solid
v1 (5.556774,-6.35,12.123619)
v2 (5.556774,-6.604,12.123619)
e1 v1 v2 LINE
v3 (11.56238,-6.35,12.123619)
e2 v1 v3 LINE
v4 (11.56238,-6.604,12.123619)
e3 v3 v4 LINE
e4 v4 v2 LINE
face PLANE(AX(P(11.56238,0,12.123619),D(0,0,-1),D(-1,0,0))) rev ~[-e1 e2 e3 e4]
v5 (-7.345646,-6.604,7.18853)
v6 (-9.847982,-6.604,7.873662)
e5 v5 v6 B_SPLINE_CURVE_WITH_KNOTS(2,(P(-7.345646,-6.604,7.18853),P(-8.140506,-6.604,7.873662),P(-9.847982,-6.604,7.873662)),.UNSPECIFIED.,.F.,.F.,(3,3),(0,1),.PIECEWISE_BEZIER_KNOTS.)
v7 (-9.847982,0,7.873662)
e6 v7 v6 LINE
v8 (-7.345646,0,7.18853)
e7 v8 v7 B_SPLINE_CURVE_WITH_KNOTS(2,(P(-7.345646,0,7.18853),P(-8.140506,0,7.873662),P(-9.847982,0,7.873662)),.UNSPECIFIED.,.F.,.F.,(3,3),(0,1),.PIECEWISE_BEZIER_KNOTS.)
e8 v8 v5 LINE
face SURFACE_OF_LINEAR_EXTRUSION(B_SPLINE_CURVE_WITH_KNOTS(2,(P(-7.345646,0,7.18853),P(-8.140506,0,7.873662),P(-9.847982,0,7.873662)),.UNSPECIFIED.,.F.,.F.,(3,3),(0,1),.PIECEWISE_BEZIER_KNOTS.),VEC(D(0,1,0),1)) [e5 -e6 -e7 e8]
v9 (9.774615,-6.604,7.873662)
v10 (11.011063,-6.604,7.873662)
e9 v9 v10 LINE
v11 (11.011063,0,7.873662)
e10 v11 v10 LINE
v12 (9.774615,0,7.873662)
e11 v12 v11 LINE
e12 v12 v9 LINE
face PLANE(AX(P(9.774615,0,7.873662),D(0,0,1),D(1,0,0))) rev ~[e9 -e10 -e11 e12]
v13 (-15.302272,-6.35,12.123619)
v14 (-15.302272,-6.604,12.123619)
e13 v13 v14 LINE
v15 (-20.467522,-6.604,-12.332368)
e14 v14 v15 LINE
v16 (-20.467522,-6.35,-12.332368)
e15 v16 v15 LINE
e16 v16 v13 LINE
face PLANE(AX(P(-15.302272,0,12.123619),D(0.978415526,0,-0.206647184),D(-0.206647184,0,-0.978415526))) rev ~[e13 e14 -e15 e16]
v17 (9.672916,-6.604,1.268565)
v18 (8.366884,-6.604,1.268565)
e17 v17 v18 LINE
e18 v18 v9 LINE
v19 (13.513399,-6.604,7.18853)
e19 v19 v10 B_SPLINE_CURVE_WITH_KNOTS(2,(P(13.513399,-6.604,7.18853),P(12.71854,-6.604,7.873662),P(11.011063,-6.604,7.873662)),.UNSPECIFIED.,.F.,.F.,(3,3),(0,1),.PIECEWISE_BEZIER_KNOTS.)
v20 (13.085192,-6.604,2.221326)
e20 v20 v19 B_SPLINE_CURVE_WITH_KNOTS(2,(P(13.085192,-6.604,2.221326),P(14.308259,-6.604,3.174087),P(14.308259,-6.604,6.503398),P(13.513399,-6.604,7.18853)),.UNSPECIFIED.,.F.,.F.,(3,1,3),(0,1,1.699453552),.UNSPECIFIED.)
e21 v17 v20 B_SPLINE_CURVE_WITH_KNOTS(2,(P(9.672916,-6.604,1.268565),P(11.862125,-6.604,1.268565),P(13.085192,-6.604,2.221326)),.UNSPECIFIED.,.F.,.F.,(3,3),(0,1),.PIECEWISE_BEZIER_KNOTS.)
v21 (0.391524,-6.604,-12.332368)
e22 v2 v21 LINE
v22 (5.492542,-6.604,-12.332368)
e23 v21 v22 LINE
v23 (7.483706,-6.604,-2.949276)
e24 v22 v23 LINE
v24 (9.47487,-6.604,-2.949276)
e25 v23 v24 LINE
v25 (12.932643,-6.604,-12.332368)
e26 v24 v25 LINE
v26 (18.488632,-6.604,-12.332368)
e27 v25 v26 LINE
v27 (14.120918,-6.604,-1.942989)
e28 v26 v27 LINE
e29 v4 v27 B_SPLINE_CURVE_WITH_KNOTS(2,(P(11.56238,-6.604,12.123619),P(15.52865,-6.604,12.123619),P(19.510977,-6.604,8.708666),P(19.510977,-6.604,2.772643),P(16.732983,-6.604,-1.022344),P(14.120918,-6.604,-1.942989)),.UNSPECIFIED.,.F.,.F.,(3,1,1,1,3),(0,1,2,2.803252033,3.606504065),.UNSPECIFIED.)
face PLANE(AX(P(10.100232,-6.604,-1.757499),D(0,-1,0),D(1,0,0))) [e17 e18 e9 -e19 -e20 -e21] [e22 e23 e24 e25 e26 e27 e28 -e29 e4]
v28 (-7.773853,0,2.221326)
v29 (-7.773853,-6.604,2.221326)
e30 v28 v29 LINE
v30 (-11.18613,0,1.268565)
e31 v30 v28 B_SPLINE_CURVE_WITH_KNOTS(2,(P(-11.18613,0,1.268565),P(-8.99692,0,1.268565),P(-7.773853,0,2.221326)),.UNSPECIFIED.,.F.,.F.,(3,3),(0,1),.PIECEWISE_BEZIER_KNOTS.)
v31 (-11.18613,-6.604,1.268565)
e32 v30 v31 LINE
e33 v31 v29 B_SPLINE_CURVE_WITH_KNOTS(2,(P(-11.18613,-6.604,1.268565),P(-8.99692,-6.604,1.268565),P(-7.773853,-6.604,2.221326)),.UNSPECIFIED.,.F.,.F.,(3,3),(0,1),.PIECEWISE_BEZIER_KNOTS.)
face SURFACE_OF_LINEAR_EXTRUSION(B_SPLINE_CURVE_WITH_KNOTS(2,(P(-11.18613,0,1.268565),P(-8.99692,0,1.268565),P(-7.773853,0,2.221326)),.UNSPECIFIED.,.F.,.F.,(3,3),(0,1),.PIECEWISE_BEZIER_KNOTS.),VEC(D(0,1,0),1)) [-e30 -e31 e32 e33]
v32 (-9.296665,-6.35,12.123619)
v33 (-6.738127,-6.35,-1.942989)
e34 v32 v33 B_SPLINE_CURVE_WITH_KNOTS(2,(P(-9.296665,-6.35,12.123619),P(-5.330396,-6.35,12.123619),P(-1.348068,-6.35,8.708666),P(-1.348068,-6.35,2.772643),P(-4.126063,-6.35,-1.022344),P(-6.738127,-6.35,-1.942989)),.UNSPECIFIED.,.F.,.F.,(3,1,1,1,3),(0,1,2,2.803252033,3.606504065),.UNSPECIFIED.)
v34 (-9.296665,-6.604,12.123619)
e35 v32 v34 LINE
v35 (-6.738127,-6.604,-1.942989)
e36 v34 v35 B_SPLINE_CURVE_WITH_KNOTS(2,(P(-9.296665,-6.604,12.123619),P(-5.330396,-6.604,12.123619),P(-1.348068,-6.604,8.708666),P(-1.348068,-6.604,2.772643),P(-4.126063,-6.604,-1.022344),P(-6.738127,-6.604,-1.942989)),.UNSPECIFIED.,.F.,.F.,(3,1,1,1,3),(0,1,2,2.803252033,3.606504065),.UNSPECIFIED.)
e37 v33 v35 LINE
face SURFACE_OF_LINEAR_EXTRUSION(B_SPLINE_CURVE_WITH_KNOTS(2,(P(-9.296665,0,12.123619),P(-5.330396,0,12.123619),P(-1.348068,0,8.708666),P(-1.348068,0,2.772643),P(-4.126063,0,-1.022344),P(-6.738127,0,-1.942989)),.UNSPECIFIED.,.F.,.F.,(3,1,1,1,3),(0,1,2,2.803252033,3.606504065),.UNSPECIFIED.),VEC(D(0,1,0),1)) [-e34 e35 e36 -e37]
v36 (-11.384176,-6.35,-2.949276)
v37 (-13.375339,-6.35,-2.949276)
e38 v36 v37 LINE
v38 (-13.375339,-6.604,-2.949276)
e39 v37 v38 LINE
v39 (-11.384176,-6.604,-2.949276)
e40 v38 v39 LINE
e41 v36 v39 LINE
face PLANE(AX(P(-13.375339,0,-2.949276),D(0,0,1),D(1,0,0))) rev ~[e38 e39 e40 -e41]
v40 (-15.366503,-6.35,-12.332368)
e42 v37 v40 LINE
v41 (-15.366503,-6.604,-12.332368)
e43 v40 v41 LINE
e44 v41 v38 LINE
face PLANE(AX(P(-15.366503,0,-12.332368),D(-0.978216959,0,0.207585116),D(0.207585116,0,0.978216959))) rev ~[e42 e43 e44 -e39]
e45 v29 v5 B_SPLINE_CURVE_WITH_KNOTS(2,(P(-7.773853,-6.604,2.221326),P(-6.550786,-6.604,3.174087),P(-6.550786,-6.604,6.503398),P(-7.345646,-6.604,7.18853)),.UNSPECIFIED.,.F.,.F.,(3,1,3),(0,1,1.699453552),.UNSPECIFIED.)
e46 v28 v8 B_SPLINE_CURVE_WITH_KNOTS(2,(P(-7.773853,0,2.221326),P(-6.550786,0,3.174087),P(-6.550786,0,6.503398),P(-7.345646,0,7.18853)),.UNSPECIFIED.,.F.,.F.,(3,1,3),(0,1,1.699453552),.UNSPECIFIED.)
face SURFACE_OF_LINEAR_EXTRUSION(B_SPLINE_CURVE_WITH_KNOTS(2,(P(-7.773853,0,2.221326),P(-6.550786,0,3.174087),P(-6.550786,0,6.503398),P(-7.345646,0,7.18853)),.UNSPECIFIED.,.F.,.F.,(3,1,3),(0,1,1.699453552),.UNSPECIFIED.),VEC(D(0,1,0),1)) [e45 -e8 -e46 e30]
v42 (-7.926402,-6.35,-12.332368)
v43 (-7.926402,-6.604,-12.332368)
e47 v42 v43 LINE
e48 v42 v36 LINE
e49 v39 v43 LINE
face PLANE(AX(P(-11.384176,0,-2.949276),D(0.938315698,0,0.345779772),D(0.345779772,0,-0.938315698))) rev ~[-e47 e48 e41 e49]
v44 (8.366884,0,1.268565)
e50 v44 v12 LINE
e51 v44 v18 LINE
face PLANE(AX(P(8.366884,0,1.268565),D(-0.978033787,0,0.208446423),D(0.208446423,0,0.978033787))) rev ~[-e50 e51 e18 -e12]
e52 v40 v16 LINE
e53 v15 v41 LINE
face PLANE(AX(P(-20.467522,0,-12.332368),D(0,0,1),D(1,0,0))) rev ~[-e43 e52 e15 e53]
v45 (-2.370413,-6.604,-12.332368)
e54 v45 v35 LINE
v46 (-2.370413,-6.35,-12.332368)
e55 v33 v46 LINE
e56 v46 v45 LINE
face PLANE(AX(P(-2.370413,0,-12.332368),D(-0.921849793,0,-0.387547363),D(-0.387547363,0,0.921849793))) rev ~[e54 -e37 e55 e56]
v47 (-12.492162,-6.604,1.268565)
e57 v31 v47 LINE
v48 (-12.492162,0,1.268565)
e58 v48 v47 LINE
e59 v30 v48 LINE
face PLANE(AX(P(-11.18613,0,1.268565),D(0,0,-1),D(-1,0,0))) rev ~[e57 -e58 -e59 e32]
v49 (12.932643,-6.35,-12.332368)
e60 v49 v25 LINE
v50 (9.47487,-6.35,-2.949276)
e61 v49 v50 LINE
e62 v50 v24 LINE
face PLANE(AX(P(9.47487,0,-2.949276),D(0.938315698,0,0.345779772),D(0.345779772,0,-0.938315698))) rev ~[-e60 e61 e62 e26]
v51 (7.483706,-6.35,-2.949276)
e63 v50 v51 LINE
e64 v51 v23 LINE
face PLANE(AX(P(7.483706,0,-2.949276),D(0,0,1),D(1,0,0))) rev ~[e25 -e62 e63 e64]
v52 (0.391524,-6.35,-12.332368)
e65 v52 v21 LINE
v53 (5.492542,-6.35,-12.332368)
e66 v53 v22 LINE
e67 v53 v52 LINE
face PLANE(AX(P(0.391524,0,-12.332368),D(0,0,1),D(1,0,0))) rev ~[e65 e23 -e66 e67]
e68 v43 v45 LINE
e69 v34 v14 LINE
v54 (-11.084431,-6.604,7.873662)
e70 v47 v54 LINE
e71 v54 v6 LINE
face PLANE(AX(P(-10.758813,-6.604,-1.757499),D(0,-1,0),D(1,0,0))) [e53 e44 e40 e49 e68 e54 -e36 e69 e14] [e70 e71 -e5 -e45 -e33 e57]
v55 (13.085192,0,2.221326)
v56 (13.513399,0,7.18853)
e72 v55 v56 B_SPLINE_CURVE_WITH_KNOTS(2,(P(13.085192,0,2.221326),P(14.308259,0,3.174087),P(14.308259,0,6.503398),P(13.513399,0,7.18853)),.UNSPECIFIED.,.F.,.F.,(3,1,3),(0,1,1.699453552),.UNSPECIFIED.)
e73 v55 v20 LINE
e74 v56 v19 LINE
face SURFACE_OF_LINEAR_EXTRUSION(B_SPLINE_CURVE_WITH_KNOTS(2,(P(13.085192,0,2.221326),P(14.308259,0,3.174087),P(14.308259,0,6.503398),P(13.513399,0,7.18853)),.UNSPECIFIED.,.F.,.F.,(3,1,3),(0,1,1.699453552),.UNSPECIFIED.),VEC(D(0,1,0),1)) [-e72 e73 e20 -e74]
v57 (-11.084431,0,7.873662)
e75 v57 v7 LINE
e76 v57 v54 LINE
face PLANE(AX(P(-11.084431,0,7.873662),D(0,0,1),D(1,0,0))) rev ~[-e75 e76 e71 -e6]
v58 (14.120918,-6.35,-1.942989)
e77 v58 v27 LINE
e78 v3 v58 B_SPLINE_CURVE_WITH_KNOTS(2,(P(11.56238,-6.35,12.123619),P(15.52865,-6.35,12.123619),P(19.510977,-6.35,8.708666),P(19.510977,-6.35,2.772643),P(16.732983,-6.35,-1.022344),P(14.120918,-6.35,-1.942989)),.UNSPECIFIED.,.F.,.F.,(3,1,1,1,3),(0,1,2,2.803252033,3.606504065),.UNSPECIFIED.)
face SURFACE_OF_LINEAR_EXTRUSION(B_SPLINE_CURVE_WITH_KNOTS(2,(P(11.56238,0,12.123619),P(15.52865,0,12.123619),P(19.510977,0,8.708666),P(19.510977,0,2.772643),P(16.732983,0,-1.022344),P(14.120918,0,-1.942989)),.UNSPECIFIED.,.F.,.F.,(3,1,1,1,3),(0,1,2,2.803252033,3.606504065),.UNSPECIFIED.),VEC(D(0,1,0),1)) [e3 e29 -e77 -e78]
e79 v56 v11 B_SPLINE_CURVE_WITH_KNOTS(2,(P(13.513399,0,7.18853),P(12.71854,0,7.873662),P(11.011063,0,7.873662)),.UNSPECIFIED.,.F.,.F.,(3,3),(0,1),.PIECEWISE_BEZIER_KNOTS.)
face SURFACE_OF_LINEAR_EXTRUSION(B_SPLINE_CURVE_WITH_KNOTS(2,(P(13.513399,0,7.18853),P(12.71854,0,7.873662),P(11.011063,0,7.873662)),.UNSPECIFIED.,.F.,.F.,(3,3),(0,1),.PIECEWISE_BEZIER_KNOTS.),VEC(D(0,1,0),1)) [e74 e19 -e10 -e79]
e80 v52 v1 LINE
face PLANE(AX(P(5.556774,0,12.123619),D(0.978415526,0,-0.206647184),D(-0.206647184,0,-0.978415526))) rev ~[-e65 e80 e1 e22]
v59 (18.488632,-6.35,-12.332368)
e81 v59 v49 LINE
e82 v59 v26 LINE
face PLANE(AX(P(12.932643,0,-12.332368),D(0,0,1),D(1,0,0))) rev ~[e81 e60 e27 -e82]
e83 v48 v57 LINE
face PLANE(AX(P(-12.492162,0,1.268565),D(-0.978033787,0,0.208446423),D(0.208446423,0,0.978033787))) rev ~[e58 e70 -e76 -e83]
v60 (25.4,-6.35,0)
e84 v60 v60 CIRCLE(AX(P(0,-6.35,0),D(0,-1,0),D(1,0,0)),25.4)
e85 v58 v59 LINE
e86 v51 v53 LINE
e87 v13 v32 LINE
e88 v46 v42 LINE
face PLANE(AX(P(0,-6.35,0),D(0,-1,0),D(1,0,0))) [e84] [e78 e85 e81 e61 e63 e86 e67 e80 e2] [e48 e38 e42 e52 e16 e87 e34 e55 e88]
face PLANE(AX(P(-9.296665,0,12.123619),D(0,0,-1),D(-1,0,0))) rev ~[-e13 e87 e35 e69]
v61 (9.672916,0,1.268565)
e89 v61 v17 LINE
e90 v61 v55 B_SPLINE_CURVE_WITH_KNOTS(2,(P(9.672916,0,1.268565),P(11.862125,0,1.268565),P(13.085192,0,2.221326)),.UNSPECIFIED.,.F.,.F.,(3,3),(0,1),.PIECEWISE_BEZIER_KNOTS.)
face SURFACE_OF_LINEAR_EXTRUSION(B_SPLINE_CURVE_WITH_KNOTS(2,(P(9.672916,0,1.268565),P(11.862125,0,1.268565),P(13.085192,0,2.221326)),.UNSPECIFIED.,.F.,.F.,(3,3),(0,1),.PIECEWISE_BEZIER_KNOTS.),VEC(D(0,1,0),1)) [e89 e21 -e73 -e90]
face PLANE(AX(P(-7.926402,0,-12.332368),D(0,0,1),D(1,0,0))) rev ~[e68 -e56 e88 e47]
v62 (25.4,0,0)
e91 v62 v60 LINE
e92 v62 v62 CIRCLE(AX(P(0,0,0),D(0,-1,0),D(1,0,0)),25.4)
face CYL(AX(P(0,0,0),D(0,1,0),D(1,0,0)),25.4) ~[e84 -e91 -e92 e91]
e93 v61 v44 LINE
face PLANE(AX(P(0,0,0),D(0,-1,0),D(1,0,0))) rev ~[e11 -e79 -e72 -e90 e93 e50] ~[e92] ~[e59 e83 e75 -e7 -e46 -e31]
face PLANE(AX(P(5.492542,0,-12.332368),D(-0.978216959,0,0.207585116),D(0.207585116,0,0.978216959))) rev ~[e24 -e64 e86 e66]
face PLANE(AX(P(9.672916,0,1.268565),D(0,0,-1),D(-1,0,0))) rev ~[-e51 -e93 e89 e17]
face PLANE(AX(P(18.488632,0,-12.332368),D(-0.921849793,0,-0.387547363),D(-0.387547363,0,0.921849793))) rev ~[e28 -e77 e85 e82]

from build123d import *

# Parameters (mm, degrees)
F0_R     = 25.4
F1_DEPTH = 6.35
F3_DEPTH = 6.604
F4_DEPTH = 6.604


# Not quite as in the source:
# - the program builds the solid bodies; features that only make, move or delete a surface that nothing else refers to are left out


with BuildPart() as f1:
    # F0 (on Front) → F1 (new body)
    with BuildSketch(Plane.XZ):
        Circle(F0_R)
        with BuildLine():
            Line((-11.384175581, -2.9492764653), (-13.375339268, -2.9492764653))
            Line((-13.375339268, -2.9492764653), (-15.3665029551, -12.3323677108))
            Line((-15.3665029551, -12.3323677108), (-20.4675217554, -12.3323677108))
            Line((-20.4675217554, -12.3323677108), (-15.3022718684, 12.1236185417))
            Line((-15.3022718684, 12.1236185417), (-9.296665264, 12.1236185417))
            add(Edge.make_bspline(
                [(-9.296665264, 12.1236185417), (-5.3303956617, 12.1236185417), (-3.3392319747, 10.4161421542)],
                knots=[0, 0, 0, 1, 1, 1], degree=2))
            add(Edge.make_bspline(
                [(-3.3392319747, 10.4161421542), (-1.3480682877, 8.7086657667), (-1.3480682877, 5.4168225745)],
                knots=[0, 0, 0, 1, 1, 1], degree=2))
            add(Edge.make_bspline(
                [(-1.3480682877, 5.4168225745), (-1.3480682877, 2.7726428396), (-2.7370655371, 0.8751494873)],
                knots=[0, 0, 0, 1, 1, 1], degree=2))
            add(Edge.make_bspline(
                [(-2.7370655371, 0.8751494873), (-4.1260627865, -1.022343865), (-6.738126978, -1.9429894407)],
                knots=[0, 0, 0, 1, 1, 1], degree=2))
            Line((-6.738126978, -1.9429894407), (-2.370413084, -12.3323677108))
            Line((-2.370413084, -12.3323677108), (-7.9264020816, -12.3323677108))
            Line((-7.9264020816, -12.3323677108), (-11.384175581, -2.9492764653))
        make_face(mode=Mode.SUBTRACT)
        with BuildLine():
            Line((9.4748698175, -2.9492764653), (7.4837061305, -2.9492764653))
            Line((7.4837061305, -2.9492764653), (5.4925424435, -12.3323677108))
            Line((5.4925424435, -12.3323677108), (0.3915236432, -12.3323677108))
            Line((0.3915236432, -12.3323677108), (5.5567735302, 12.1236185417))
            Line((5.5567735302, 12.1236185417), (11.5623801345, 12.1236185417))
            add(Edge.make_bspline(
                [(11.5623801345, 12.1236185417), (15.5286497369, 12.1236185417), (17.5198134239, 10.4161421542)],
                knots=[0, 0, 0, 1, 1, 1], degree=2))
            add(Edge.make_bspline(
                [(17.5198134239, 10.4161421542), (19.5109771109, 8.7086657667), (19.5109771109, 5.4168225745)],
                knots=[0, 0, 0, 1, 1, 1], degree=2))
            add(Edge.make_bspline(
                [(19.5109771109, 5.4168225745), (19.5109771109, 2.7726428396), (18.1219798615, 0.8751494873)],
                knots=[0, 0, 0, 1, 1, 1], degree=2))
            add(Edge.make_bspline(
                [(18.1219798615, 0.8751494873), (16.7329826121, -1.022343865), (14.1209184205, -1.9429894407)],
                knots=[0, 0, 0, 1, 1, 1], degree=2))
            Line((14.1209184205, -1.9429894407), (18.4886323146, -12.3323677108))
            Line((18.4886323146, -12.3323677108), (12.932643317, -12.3323677108))
            Line((12.932643317, -12.3323677108), (9.4748698175, -2.9492764653))
        make_face(mode=Mode.SUBTRACT)
    extrude(amount=F1_DEPTH)

    # F0 (on Front) → F3 (join)
    with BuildSketch(Plane.XZ):
        with BuildLine():
            Line((5.4925424435, -12.3323677108), (7.4837061305, -2.9492764653))
            Line((7.4837061305, -2.9492764653), (9.4748698175, -2.9492764653))
            Line((9.4748698175, -2.9492764653), (12.932643317, -12.3323677108))
            Line((12.932643317, -12.3323677108), (18.4886323146, -12.3323677108))
            Line((18.4886323146, -12.3323677108), (14.1209184205, -1.9429894407))
            add(Edge.make_bspline(
                [(18.1219798615, 0.8751494873), (16.7329826121, -1.022343865), (14.1209184205, -1.9429894407)],
                knots=[0, 0, 0, 1, 1, 1], degree=2))
            add(Edge.make_bspline(
                [(19.5109771109, 5.4168225745), (19.5109771109, 2.7726428396), (18.1219798615, 0.8751494873)],
                knots=[0, 0, 0, 1, 1, 1], degree=2))
            add(Edge.make_bspline(
                [(17.5198134239, 10.4161421542), (19.5109771109, 8.7086657667), (19.5109771109, 5.4168225745)],
                knots=[0, 0, 0, 1, 1, 1], degree=2))
            add(Edge.make_bspline(
                [(11.5623801345, 12.1236185417), (15.5286497369, 12.1236185417), (17.5198134239, 10.4161421542)],
                knots=[0, 0, 0, 1, 1, 1], degree=2))
            Line((11.5623801345, 12.1236185417), (5.5567735302, 12.1236185417))
            Line((5.5567735302, 12.1236185417), (0.3915236432, -12.3323677108))
            Line((0.3915236432, -12.3323677108), (5.4925424435, -12.3323677108))
        make_face()
        with BuildLine():
            Line((9.6729156681, 1.2685648932), (8.3668835723, 1.2685648932))
            Line((8.3668835723, 1.2685648932), (9.7746148887, 7.8736616399))
            Line((9.7746148887, 7.8736616399), (11.0110633072, 7.8736616399))
            add(Edge.make_bspline(
                [(13.5133993923, 7.1885300487), (12.7185396947, 7.8736616399), (11.0110633072, 7.8736616399)],
                knots=[0, 0, 0, 1, 1, 1], degree=2))
            add(Edge.make_bspline(
                [(14.30825909, 5.133135275), (14.30825909, 6.5033984574), (13.5133993923, 7.1885300487)],
                knots=[0, 0, 0, 1, 1, 1], degree=2))
            add(Edge.make_bspline(
                [(13.0851921478, 2.2213260123), (14.30825909, 3.1740871313), (14.30825909, 5.133135275)],
                knots=[0, 0, 0, 1, 1, 1], degree=2))
            add(Edge.make_bspline(
                [(9.6729156681, 1.2685648932), (11.8621252057, 1.2685648932), (13.0851921478, 2.2213260123)],
                knots=[0, 0, 0, 1, 1, 1], degree=2))
        make_face(mode=Mode.SUBTRACT)
    extrude(amount=F3_DEPTH)

    # F0 (on Front) → F4 (join)
    with BuildSketch(Plane.XZ):
        with BuildLine():
            Line((-15.3665029551, -12.3323677108), (-13.375339268, -2.9492764653))
            Line((-13.375339268, -2.9492764653), (-11.384175581, -2.9492764653))
            Line((-11.384175581, -2.9492764653), (-7.9264020816, -12.3323677108))
            Line((-7.9264020816, -12.3323677108), (-2.370413084, -12.3323677108))
            Line((-2.370413084, -12.3323677108), (-6.738126978, -1.9429894407))
            add(Edge.make_bspline(
                [(-2.7370655371, 0.8751494873), (-4.1260627865, -1.022343865), (-6.738126978, -1.9429894407)],
                knots=[0, 0, 0, 1, 1, 1], degree=2))
            add(Edge.make_bspline(
                [(-1.3480682877, 5.4168225745), (-1.3480682877, 2.7726428396), (-2.7370655371, 0.8751494873)],
                knots=[0, 0, 0, 1, 1, 1], degree=2))
            add(Edge.make_bspline(
                [(-3.3392319747, 10.4161421542), (-1.3480682877, 8.7086657667), (-1.3480682877, 5.4168225745)],
                knots=[0, 0, 0, 1, 1, 1], degree=2))
            add(Edge.make_bspline(
                [(-9.296665264, 12.1236185417), (-5.3303956617, 12.1236185417), (-3.3392319747, 10.4161421542)],
                knots=[0, 0, 0, 1, 1, 1], degree=2))
            Line((-9.296665264, 12.1236185417), (-15.3022718684, 12.1236185417))
            Line((-15.3022718684, 12.1236185417), (-20.4675217554, -12.3323677108))
            Line((-20.4675217554, -12.3323677108), (-15.3665029551, -12.3323677108))
        make_face()
        with BuildLine():
            Line((-11.1861297305, 1.2685648932), (-12.4921618262, 1.2685648932))
            Line((-12.4921618262, 1.2685648932), (-11.0844305099, 7.8736616399))
            Line((-11.0844305099, 7.8736616399), (-9.8479820913, 7.8736616399))
            add(Edge.make_bspline(
                [(-7.3456460062, 7.1885300487), (-8.1405057038, 7.8736616399), (-9.8479820913, 7.8736616399)],
                knots=[0, 0, 0, 1, 1, 1], degree=2))
            add(Edge.make_bspline(
                [(-6.5507863086, 5.133135275), (-6.5507863086, 6.5033984574), (-7.3456460062, 7.1885300487)],
                knots=[0, 0, 0, 1, 1, 1], degree=2))
            add(Edge.make_bspline(
                [(-7.7738532507, 2.2213260123), (-6.5507863086, 3.1740871313), (-6.5507863086, 5.133135275)],
                knots=[0, 0, 0, 1, 1, 1], degree=2))
            add(Edge.make_bspline(
                [(-11.1861297305, 1.2685648932), (-8.9969201929, 1.2685648932), (-7.7738532507, 2.2213260123)],
                knots=[0, 0, 0, 1, 1, 1], degree=2))
        make_face(mode=Mode.SUBTRACT)
    extrude(amount=F4_DEPTH)


solid = f1.part
